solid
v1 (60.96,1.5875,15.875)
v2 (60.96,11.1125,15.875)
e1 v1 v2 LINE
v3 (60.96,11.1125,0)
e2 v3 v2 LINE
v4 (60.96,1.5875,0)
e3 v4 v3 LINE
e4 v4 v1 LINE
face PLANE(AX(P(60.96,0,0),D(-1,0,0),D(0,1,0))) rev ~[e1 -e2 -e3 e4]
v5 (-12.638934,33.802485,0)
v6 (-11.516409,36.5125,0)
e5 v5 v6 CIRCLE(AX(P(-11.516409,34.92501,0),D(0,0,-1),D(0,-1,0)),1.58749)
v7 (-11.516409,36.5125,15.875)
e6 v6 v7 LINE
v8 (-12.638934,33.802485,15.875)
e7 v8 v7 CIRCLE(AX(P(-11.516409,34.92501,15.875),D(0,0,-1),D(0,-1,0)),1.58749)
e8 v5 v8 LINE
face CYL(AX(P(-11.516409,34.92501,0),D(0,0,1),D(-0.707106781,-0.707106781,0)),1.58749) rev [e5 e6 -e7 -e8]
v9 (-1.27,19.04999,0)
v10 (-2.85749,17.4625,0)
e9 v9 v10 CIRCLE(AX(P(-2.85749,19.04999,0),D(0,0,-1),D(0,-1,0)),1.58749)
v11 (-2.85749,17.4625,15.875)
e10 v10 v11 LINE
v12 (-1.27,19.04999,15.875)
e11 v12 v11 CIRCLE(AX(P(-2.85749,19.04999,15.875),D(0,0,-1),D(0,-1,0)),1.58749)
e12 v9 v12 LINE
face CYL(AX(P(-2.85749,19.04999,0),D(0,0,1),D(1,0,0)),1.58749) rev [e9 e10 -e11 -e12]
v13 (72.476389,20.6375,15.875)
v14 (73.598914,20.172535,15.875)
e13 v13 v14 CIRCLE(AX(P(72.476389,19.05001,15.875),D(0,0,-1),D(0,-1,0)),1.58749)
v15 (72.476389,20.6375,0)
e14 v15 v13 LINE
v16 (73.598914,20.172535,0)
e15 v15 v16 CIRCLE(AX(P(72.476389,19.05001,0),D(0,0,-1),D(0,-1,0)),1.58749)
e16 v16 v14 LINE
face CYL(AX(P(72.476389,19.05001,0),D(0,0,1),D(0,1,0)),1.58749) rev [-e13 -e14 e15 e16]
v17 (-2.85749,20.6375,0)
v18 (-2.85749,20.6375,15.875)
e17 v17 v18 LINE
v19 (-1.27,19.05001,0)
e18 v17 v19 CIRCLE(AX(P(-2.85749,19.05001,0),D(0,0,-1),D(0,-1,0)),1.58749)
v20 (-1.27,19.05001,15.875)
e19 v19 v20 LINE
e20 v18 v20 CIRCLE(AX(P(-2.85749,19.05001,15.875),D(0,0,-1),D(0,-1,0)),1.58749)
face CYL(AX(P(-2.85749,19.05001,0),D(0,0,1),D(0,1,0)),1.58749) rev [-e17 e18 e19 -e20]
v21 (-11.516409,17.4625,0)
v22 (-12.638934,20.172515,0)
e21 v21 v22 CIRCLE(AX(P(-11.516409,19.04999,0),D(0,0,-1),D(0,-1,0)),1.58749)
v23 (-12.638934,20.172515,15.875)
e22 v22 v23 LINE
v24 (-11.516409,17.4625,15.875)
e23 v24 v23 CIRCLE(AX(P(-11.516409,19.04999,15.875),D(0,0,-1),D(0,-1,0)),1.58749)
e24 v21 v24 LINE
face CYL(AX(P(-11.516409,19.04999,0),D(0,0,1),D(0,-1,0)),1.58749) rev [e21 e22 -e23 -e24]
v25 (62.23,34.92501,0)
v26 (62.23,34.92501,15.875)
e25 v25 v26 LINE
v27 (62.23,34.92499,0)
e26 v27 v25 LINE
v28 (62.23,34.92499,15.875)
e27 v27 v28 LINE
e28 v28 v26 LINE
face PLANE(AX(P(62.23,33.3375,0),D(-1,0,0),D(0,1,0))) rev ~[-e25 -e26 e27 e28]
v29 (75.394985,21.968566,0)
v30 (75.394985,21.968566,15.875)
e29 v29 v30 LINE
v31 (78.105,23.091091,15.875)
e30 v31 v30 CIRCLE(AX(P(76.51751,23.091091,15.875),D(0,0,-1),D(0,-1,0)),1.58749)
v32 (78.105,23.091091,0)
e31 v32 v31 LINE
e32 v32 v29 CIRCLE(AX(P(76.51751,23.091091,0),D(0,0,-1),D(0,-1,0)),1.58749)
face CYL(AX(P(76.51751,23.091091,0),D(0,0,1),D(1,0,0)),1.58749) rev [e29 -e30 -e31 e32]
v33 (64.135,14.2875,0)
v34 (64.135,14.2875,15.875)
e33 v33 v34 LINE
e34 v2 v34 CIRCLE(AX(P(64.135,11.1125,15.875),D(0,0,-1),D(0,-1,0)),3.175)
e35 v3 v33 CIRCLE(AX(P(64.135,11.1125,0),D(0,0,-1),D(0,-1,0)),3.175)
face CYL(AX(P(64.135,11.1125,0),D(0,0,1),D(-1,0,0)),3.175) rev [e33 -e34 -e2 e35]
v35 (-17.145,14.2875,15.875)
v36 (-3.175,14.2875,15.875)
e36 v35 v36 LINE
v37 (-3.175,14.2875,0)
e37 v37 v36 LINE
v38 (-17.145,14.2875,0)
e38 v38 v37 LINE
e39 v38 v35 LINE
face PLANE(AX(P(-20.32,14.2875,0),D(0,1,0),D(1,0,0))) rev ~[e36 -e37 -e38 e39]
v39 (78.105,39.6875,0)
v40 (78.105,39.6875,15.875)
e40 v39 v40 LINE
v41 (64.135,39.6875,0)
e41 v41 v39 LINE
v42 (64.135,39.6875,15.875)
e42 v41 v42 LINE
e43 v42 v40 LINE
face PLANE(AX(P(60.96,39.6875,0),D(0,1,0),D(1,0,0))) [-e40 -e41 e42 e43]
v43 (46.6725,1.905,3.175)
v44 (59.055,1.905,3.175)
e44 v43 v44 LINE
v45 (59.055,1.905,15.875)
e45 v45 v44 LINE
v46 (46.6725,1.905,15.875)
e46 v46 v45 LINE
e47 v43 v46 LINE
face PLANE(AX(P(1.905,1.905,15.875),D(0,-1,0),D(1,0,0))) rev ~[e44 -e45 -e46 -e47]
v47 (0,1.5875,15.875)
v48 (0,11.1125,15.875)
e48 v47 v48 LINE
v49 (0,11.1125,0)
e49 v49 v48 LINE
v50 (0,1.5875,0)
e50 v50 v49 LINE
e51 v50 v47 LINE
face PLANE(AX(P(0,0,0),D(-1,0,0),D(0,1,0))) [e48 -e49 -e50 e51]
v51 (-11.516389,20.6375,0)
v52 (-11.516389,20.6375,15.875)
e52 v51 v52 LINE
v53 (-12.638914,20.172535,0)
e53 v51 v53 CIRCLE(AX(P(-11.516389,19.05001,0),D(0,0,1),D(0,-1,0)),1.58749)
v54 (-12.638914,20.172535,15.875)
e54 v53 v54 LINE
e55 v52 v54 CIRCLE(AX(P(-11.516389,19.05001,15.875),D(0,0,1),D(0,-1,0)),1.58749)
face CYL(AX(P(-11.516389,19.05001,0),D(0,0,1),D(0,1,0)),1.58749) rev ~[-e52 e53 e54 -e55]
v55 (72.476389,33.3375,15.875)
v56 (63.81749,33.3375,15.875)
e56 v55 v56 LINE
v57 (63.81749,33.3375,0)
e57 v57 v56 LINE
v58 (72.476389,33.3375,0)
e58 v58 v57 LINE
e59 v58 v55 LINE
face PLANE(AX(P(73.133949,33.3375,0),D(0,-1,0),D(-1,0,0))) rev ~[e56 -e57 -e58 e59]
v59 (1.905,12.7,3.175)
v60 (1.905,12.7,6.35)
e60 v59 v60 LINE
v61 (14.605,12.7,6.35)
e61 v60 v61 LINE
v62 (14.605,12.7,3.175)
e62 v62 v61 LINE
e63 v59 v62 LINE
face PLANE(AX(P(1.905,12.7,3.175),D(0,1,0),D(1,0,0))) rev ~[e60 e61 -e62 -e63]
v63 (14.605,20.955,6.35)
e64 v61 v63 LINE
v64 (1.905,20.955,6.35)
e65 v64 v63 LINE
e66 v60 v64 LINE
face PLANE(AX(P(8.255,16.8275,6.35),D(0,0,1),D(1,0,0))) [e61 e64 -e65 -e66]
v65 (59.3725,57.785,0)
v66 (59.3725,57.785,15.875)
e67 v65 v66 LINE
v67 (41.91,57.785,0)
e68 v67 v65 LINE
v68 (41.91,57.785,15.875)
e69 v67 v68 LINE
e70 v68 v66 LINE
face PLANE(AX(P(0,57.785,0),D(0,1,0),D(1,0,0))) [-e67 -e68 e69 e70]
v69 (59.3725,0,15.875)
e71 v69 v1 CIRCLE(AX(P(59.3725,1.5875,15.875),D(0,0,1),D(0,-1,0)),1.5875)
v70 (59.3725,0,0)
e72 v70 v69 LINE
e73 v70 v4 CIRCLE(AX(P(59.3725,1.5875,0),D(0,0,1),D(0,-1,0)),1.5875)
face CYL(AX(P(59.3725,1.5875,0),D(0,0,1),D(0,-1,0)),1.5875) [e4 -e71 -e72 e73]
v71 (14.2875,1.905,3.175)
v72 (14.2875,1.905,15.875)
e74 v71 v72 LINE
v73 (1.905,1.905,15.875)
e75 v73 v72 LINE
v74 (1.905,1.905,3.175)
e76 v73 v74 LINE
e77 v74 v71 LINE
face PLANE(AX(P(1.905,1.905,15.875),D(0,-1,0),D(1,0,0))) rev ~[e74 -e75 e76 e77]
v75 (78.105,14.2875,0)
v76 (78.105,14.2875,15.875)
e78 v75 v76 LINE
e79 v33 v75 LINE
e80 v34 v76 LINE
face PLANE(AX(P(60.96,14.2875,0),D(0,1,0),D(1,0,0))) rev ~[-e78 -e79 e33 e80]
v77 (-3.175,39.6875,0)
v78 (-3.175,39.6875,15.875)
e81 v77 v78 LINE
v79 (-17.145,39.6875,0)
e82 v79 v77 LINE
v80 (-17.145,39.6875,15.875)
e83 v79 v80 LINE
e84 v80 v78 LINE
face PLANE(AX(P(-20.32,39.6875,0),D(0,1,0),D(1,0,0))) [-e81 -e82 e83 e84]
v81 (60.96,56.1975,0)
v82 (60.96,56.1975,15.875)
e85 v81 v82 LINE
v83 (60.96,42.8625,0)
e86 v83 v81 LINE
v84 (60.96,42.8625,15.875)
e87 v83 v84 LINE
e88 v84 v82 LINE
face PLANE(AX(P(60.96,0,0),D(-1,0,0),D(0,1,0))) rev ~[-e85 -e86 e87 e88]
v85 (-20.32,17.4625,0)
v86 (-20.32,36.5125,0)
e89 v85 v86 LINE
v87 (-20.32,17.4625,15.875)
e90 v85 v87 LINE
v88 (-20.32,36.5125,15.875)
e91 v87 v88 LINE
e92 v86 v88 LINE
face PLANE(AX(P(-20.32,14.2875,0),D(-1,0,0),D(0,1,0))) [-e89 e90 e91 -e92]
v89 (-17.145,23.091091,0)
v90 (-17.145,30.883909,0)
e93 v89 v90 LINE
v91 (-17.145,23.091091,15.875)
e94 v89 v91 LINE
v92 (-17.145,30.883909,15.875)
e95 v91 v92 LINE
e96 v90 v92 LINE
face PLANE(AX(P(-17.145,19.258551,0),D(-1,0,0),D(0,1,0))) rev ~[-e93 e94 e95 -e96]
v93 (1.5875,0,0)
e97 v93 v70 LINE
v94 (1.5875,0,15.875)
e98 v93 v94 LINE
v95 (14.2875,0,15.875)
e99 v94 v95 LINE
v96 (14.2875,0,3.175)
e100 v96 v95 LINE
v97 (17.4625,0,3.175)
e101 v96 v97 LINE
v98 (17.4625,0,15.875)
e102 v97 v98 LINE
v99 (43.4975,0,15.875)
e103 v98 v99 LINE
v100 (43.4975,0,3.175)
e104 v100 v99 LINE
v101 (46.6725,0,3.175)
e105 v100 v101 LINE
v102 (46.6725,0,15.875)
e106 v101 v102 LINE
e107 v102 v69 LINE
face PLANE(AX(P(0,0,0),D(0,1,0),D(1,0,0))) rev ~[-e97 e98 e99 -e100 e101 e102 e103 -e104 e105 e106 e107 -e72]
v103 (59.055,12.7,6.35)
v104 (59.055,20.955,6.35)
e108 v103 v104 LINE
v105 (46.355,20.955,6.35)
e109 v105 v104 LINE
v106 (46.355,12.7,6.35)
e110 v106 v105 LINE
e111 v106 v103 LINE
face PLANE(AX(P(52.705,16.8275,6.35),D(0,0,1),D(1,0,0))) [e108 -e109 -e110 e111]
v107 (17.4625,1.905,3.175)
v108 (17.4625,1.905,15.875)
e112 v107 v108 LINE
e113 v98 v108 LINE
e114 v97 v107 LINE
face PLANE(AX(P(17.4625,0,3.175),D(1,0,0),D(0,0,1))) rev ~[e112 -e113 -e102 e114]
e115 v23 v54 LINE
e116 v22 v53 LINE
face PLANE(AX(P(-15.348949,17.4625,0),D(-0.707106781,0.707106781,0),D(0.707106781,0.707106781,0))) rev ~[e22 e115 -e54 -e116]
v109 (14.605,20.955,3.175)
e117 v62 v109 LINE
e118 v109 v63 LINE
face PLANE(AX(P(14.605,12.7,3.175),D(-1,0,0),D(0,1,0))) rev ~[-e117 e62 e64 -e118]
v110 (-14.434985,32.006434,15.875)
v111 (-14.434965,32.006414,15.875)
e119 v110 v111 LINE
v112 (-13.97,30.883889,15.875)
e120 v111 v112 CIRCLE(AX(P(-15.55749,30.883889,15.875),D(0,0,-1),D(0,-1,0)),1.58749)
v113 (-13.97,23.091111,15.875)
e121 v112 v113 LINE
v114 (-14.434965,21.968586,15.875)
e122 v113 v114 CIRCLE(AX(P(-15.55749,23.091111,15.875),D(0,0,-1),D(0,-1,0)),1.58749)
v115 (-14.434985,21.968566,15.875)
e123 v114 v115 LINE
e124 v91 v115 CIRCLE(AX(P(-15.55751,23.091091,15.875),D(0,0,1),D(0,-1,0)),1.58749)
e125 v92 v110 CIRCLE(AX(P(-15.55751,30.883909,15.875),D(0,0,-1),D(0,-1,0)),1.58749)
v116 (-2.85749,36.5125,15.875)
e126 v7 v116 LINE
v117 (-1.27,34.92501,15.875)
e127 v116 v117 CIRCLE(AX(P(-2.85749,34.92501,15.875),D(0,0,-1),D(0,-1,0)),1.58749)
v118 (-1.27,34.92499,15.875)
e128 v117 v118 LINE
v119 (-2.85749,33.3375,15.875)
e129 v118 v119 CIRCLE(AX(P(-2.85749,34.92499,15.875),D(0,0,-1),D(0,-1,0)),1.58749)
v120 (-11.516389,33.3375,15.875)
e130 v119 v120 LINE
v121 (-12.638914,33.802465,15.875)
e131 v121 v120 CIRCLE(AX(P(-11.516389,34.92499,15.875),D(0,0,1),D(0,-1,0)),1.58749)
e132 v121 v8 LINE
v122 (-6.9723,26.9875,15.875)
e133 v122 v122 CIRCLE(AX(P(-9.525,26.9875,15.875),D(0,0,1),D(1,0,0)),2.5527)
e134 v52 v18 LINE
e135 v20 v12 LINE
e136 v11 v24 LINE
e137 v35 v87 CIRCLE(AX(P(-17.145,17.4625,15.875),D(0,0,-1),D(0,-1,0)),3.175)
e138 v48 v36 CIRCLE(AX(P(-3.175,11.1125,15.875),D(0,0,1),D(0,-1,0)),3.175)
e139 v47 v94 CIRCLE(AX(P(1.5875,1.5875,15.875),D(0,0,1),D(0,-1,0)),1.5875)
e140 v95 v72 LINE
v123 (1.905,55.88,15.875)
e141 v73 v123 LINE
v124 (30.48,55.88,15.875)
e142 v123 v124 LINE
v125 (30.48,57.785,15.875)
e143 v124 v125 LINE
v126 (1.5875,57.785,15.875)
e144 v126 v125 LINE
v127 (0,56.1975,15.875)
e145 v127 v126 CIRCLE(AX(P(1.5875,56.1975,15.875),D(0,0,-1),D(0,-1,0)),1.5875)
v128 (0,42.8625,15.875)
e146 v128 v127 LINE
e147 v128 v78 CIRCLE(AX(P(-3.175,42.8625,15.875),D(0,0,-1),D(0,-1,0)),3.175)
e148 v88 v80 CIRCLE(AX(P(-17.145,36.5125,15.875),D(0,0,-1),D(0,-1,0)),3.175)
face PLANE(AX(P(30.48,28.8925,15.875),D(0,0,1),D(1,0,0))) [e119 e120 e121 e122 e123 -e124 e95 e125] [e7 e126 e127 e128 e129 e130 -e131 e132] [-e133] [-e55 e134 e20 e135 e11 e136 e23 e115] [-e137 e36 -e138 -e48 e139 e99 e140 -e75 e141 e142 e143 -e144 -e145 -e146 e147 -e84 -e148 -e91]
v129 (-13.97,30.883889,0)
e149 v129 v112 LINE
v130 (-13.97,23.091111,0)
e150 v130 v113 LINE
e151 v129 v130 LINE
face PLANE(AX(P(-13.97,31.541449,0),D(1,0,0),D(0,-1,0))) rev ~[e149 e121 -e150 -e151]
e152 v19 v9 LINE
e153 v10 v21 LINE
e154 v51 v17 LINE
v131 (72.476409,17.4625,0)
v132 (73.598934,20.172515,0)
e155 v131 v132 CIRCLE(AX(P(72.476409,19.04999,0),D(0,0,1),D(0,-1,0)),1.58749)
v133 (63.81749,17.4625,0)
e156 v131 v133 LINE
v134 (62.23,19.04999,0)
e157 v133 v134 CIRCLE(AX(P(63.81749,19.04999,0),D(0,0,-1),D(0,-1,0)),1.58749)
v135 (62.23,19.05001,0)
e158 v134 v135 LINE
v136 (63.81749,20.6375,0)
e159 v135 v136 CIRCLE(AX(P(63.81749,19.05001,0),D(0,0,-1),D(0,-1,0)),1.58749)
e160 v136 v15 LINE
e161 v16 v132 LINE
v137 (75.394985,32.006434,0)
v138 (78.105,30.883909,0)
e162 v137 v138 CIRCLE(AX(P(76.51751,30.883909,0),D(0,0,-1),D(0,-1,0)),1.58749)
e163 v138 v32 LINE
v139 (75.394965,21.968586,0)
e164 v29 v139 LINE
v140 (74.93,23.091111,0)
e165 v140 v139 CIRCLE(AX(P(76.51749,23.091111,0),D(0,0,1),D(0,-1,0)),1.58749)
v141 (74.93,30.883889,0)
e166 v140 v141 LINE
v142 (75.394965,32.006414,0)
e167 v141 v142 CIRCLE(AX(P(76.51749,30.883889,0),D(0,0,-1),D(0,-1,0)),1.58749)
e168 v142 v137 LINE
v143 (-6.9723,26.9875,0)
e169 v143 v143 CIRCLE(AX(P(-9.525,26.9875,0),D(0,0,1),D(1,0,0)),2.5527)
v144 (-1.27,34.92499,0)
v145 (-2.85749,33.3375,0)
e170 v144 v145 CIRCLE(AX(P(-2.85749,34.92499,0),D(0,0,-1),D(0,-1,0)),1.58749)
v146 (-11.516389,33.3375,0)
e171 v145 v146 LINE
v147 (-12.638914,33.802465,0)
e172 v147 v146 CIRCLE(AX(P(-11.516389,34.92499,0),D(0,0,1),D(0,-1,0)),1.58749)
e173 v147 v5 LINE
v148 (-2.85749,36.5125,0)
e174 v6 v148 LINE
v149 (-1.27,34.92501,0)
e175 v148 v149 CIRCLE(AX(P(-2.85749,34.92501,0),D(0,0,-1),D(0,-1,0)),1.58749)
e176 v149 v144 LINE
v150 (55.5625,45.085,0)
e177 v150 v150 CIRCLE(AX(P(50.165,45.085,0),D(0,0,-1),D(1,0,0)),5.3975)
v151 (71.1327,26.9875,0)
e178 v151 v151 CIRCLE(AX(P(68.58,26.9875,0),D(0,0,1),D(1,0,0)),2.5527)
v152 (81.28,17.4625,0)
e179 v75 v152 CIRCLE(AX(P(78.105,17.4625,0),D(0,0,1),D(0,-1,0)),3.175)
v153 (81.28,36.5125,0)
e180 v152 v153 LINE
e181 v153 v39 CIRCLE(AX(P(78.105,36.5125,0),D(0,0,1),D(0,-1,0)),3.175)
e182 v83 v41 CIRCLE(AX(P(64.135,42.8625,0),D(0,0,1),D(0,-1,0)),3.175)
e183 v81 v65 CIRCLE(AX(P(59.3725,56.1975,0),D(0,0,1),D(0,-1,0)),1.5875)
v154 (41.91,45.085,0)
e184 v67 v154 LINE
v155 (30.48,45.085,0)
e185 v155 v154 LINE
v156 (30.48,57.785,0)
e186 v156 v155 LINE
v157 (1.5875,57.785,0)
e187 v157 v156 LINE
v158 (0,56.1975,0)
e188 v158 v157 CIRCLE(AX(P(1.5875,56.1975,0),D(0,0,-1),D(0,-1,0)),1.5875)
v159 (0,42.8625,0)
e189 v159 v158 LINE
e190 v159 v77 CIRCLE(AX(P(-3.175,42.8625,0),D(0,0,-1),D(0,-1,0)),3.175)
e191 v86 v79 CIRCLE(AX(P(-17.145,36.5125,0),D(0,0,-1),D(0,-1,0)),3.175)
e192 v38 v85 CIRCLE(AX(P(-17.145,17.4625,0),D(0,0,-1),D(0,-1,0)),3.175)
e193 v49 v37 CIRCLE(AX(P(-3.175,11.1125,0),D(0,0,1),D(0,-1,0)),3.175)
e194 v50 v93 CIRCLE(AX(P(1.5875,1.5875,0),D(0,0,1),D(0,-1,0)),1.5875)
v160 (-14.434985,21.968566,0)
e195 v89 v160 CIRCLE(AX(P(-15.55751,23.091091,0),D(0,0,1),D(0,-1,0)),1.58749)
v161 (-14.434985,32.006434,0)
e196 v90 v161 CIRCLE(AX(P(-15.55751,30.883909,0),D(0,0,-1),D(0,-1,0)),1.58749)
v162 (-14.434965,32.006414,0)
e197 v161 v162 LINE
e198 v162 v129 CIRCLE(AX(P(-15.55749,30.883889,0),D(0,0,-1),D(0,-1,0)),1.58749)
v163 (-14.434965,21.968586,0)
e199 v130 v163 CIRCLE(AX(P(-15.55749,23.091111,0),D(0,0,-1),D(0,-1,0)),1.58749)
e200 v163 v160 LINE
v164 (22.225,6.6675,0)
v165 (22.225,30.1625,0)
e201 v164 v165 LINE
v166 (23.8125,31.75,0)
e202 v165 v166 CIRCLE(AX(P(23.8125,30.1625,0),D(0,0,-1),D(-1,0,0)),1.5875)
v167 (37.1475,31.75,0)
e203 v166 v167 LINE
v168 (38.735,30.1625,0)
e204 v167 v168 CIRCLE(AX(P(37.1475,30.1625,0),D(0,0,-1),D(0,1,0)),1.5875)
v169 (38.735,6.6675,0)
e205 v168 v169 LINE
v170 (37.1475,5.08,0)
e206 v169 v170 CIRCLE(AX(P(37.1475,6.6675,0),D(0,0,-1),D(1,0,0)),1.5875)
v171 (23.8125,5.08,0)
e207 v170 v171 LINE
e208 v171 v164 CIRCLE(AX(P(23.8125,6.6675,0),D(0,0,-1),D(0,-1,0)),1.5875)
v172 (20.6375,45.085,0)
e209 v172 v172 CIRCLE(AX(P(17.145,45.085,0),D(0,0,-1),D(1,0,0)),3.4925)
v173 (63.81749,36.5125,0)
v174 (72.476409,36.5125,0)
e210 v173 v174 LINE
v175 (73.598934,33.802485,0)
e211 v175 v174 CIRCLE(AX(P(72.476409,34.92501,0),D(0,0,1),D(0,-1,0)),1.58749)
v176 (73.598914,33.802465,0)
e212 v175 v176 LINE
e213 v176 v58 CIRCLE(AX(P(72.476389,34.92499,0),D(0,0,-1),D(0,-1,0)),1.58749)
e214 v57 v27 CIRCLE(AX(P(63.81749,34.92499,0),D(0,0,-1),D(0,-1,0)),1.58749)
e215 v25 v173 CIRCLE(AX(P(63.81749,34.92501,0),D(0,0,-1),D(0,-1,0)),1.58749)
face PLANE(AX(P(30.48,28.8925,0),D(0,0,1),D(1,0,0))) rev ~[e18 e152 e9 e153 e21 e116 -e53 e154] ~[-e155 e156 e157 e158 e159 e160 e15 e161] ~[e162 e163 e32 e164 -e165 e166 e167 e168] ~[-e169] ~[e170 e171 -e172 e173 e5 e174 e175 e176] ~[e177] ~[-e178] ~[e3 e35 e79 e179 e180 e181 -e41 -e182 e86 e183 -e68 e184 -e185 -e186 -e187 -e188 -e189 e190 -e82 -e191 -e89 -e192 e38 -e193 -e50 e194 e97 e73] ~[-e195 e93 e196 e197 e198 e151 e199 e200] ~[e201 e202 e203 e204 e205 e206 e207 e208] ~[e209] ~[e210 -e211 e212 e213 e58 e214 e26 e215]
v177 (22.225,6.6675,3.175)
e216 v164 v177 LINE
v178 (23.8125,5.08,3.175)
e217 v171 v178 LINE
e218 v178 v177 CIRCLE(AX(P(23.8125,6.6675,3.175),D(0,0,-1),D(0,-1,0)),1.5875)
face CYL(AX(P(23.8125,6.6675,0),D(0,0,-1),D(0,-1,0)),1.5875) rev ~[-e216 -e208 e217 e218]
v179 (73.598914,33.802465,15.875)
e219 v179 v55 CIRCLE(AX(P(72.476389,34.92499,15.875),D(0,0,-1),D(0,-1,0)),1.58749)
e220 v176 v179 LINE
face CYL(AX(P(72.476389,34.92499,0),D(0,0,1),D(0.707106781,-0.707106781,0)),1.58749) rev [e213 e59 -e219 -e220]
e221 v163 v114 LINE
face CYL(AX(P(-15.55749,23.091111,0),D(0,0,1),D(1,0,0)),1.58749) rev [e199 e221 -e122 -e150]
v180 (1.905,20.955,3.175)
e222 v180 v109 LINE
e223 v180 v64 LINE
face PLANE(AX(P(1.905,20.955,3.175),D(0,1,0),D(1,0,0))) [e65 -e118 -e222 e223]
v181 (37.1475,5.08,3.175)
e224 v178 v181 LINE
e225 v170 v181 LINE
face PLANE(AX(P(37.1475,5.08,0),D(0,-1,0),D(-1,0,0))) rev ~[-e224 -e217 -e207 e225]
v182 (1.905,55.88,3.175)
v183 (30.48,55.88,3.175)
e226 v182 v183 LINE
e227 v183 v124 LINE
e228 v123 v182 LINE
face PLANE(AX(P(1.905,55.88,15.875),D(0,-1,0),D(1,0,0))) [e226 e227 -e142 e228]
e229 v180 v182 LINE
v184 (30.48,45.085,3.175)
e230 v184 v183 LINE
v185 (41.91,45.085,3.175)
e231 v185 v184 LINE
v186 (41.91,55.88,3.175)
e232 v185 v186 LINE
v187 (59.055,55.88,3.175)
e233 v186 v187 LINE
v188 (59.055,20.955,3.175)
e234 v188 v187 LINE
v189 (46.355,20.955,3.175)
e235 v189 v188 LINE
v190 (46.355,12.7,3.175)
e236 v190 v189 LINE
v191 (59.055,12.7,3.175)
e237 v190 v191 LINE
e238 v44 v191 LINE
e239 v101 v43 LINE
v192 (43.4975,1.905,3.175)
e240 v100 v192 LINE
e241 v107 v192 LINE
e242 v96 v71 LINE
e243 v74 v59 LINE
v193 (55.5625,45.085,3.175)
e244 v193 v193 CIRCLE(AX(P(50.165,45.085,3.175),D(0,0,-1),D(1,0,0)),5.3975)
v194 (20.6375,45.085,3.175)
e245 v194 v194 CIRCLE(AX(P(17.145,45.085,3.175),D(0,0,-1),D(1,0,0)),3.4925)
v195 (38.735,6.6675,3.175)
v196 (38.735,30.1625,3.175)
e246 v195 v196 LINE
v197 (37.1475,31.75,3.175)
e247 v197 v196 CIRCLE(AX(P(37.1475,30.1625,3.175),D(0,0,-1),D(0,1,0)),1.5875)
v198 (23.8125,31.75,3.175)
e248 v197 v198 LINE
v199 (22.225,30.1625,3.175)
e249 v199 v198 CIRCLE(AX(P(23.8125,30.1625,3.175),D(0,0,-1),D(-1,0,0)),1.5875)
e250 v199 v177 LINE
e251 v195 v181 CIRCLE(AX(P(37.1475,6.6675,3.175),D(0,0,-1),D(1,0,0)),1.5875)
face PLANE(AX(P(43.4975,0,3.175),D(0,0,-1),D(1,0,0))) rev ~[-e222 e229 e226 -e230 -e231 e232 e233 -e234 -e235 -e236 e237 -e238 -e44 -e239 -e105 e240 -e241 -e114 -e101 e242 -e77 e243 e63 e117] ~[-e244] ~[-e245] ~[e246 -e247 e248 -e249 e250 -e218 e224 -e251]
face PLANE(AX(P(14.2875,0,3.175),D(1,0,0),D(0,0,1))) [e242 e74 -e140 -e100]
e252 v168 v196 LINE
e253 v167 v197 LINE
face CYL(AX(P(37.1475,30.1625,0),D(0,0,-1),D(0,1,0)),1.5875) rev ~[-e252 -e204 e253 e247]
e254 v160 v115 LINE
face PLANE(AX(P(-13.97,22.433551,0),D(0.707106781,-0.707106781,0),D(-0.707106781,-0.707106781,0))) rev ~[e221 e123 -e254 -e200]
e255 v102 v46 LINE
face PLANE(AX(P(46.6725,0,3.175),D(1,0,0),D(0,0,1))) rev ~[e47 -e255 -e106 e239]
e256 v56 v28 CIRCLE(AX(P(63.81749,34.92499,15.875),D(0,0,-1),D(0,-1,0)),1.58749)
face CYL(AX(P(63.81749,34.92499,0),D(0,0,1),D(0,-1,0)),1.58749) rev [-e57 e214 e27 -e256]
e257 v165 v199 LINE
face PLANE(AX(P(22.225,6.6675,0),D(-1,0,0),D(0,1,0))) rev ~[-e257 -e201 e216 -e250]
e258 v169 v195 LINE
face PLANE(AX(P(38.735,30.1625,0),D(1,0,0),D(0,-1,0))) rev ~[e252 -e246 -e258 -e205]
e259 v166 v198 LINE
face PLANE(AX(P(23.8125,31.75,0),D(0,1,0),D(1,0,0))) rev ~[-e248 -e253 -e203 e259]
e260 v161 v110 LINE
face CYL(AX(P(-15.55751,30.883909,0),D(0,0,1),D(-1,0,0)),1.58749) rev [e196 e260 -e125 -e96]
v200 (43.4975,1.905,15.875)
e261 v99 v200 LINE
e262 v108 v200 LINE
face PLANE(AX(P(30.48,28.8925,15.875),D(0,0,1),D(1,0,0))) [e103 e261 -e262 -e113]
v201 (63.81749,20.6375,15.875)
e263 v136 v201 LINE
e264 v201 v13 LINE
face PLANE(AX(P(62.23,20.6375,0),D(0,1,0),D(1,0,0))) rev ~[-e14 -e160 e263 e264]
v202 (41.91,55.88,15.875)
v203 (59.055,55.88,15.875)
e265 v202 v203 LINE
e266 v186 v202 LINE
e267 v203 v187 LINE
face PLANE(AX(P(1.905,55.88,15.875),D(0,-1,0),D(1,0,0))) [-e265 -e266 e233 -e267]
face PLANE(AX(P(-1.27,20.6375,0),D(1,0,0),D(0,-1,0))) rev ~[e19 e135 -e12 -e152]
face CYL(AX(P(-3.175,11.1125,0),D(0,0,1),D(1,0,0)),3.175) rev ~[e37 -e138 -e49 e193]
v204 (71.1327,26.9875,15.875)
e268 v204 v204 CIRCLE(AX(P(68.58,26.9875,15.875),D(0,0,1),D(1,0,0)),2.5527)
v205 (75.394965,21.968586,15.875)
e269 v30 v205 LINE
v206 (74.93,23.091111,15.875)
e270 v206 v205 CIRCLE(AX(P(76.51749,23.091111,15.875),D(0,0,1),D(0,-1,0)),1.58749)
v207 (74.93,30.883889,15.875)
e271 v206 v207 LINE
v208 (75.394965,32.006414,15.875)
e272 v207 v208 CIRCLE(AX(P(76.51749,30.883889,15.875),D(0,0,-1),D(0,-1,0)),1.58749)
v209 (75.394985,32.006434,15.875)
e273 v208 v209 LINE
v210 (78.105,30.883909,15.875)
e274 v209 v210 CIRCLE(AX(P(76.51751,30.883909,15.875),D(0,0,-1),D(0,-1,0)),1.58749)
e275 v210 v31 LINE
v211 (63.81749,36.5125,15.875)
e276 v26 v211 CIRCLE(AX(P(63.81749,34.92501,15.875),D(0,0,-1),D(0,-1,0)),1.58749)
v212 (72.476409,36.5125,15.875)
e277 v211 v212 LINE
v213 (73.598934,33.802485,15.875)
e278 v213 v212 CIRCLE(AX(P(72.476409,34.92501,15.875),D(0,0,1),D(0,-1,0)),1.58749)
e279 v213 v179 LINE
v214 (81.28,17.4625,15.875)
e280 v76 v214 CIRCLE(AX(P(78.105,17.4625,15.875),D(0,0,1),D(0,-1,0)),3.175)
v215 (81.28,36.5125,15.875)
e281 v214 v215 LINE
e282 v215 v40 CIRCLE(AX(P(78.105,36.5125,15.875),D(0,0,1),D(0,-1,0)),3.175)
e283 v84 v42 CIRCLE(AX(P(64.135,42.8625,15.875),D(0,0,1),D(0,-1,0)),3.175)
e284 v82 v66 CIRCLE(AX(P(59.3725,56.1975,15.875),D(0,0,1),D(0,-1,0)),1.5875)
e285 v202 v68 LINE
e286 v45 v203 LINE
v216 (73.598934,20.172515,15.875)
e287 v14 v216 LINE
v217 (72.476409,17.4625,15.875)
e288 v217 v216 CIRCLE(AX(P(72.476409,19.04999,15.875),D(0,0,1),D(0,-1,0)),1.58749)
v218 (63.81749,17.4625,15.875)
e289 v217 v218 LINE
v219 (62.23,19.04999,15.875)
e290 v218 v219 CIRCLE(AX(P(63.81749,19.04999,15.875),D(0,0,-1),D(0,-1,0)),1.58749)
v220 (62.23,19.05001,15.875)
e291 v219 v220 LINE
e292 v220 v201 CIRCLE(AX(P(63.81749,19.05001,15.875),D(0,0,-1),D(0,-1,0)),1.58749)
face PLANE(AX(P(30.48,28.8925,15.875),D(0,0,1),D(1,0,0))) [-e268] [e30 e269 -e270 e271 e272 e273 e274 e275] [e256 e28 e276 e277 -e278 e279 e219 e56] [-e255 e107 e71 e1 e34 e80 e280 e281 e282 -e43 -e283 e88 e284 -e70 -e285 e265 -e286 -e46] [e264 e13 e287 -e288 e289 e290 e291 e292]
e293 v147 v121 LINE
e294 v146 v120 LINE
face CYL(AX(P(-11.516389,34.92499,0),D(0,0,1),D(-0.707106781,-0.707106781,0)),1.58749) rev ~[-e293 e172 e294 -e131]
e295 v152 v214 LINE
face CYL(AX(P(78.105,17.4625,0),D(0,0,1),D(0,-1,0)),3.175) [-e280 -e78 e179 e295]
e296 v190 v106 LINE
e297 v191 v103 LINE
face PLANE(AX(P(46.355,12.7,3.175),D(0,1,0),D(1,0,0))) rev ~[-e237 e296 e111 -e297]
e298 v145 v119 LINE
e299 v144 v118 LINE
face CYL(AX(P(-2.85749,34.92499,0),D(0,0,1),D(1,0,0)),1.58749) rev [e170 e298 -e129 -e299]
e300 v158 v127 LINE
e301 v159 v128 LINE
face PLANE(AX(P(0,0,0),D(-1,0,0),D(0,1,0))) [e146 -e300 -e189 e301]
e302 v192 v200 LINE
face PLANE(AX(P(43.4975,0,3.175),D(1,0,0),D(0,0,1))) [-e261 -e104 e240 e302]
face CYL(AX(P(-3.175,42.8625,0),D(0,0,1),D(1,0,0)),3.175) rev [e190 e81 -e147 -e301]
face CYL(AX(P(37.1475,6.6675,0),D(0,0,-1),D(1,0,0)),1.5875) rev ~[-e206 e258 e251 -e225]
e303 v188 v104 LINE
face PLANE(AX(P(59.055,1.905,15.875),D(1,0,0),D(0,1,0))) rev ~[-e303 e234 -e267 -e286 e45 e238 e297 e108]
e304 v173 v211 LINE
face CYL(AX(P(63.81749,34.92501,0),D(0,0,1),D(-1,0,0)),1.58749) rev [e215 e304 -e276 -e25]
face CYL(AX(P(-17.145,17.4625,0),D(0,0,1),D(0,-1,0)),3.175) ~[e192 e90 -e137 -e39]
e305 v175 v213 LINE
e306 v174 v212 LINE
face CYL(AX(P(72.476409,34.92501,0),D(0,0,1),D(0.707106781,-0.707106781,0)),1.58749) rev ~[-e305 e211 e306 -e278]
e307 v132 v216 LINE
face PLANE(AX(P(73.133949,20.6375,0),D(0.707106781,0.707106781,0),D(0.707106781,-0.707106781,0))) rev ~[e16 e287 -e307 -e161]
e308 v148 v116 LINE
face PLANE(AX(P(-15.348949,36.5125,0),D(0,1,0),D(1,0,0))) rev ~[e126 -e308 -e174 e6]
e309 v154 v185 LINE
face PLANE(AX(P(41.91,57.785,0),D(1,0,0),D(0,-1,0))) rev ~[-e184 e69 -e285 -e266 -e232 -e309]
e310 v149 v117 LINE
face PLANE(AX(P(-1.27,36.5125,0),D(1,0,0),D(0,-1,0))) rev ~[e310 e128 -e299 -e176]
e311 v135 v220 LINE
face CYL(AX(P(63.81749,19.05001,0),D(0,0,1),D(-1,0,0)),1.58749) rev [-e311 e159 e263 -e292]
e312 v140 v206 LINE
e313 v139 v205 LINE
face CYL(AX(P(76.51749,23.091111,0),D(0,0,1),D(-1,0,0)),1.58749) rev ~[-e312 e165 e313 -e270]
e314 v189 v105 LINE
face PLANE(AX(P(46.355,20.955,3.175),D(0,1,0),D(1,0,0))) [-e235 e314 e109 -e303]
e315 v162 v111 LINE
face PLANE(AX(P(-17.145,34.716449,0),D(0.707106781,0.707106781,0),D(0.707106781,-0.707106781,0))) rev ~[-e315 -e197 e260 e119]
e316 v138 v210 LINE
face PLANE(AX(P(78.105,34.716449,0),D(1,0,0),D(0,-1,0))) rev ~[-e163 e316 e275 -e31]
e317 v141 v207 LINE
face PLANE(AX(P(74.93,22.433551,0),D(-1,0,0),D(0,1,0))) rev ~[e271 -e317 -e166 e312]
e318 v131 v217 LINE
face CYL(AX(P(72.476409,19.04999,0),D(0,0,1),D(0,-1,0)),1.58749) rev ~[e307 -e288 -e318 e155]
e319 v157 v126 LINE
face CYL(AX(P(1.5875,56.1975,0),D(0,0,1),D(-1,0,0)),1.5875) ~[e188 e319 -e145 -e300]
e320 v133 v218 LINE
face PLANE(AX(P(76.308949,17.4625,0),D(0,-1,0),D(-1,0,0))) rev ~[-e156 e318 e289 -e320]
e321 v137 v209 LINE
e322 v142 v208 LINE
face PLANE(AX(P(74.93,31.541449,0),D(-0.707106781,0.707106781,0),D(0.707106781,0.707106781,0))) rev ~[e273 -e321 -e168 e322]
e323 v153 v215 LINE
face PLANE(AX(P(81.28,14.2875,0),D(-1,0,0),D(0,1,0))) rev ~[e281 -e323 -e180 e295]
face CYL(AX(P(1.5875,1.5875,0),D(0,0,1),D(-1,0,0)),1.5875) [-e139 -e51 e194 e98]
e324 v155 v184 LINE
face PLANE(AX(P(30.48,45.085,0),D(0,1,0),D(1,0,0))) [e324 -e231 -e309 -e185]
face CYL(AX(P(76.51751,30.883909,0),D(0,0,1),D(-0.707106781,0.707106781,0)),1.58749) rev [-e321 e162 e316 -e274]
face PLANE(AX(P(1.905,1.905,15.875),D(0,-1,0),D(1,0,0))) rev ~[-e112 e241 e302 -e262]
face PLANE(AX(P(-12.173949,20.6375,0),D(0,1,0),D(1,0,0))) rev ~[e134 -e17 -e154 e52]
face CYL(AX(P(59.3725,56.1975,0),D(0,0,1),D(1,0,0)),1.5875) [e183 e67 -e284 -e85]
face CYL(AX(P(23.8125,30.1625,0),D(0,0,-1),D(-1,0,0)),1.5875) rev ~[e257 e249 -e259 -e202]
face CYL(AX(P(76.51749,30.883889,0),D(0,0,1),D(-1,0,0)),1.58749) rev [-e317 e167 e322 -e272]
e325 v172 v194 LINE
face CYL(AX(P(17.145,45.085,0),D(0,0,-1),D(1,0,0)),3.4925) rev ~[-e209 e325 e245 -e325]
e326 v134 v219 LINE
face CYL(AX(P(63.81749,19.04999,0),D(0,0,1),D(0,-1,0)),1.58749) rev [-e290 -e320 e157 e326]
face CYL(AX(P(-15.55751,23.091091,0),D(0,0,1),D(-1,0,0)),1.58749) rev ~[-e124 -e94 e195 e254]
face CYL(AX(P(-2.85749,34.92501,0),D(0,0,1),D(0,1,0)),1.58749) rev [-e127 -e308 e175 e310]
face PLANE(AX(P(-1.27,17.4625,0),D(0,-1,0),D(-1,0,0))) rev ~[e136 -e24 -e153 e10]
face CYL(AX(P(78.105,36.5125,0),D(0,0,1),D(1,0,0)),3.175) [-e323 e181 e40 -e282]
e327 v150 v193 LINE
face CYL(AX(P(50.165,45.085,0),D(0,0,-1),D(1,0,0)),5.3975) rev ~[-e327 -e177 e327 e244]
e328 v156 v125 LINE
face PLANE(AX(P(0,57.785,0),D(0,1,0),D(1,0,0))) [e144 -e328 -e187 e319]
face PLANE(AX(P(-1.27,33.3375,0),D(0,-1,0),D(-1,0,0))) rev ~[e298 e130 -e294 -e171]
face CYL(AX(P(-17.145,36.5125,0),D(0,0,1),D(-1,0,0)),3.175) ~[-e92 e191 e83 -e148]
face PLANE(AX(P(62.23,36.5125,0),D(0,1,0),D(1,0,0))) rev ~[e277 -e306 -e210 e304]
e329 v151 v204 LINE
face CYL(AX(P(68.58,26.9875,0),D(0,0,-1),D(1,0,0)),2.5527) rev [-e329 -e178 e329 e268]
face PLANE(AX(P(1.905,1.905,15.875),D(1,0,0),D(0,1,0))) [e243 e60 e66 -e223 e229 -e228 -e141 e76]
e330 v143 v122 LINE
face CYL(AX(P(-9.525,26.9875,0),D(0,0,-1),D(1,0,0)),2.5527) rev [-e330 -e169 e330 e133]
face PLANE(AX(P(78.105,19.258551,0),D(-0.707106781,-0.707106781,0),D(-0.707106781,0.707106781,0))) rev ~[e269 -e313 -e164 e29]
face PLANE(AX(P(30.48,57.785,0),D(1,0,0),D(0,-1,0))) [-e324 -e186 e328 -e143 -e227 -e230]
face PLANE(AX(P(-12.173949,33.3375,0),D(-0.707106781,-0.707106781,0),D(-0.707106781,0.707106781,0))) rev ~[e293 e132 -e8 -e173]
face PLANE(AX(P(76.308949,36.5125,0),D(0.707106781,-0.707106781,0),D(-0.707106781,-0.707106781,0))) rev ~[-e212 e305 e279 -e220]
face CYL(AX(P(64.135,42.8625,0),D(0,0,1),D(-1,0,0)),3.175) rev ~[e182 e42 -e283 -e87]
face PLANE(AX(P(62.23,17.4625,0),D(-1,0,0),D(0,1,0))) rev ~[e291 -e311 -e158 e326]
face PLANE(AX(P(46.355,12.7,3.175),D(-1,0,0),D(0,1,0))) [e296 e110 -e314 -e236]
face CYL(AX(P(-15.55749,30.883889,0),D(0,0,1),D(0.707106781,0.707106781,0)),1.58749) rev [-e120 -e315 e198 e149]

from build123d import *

# Parameters (mm, degrees)
F0_W      = 60.96
F0_H      = 57.785
F1_DEPTH  = 15.875
F2_W      = 57.15
F2_H      = 53.975
F3_DEPTH  = 12.7
F4_R      = 3.4925
F4_R_2    = 5.3975
F5_DEPTH  = 15.876
F6_W      = 12.7
F6_H      = 8.255
F7_DEPTH  = 3.175
F4_W      = 11.43
F4_H      = 12.7
F10_DEPTH = 25.4
F11_R     = 1.5875
F12_W     = 20.32
F12_H     = 25.4
F12_R     = 2.5527
F13_DEPTH = 15.875
F14_R     = 3.175
F15_R     = 1.58749
F16_W     = 3.175
F16_H     = 12.7
F17_DEPTH = 1.905


# Not quite as in the source:
# - a fillet or chamfer is up to 0.001 mm smaller than in the source, because OpenCascade refuses the exact size
# - a feature names something its author has since deleted; it is built from what else it names


with BuildPart() as f1:
    # F0 (on Top) → F1 (new body)
    with BuildSketch(Plane.XY):
        with Locations((30.48, 28.8925)):
            Rectangle(F0_W, F0_H)
    extrude(amount=F1_DEPTH)

    # F2 (on face) → F3 (cut)
    with BuildSketch(Plane.XY.offset(15.875)):
        with Locations((30.48, 28.8925)):
            Rectangle(F2_W, F2_H)
    extrude(amount=-F3_DEPTH, mode=Mode.SUBTRACT)

    # F4 (on face) → F5 (cut, through all)
    with BuildSketch(Plane(origin=(0, 0, 0), x_dir=(1, 0, 0), z_dir=(0, 0, -1))):
        with Locations((17.145, -45.085)):
            Circle(F4_R)
        with Locations((50.165, -45.085)):
            Circle(F4_R_2)
        with BuildLine():
            Line((37.1475, -5.08), (23.8125, -5.08))
            ThreePointArc((23.8125, -5.08), (22.6899679849, -5.5449679849), (22.225, -6.6675))
            Line((22.225, -6.6675), (22.225, -30.1625))
            ThreePointArc((22.225, -30.1625), (22.6899679849, -31.2850320151), (23.8125, -31.75))
            Line((23.8125, -31.75), (37.1475, -31.75))
            ThreePointArc((37.1475, -31.75), (38.2700320151, -31.2850320151), (38.735, -30.1625))
            Line((38.735, -30.1625), (38.735, -6.6675))
            ThreePointArc((38.735, -6.6675), (38.2700320151, -5.5449679849), (37.1475, -5.08))
        make_face()
    extrude(amount=-F5_DEPTH, mode=Mode.SUBTRACT)

    # F6 (on face) → F7 (join)
    with BuildSketch(Plane.XY.offset(3.175)):
        with Locations((8.255, 16.8275)):
            Rectangle(F6_W, F6_H)
        with Locations((52.705, 16.8275)):
            Rectangle(F6_W, F6_H)
    extrude(amount=F7_DEPTH)

    # F4 (on face) → F10 (cut)
    with BuildSketch(Plane(origin=(0, 0, 0), x_dir=(1, 0, 0), z_dir=(0, 0, -1))):
        with Locations((36.195, -51.435)):
            Rectangle(F4_W, F4_H)
    extrude(amount=-F10_DEPTH, mode=Mode.SUBTRACT)

    # F11
    f11_edges = [f1.edges().sort_by_distance(p)[0] for p in [
        (0, 57.785, 7.9375),
        (0, 0, 7.9375),
        (60.96, 57.785, 7.9375),
        (60.96, 0, 7.9375),
    ]]
    fillet(f11_edges, radius=F11_R)

    # F12 (on Top) → F13 (join, through all)
    with BuildSketch(Plane.XY):
        with Locations((-10.16, 26.9875)):
            Rectangle(F12_W, F12_H)
        with Locations((-9.525, 26.9875)):
            Circle(F12_R, mode=Mode.SUBTRACT)
        Polygon((-12.1739487758, 20.6375), (-1.27, 20.6375), (-1.27, 17.4625), (-15.3489487758, 17.4625), (-17.145, 17.4625), (-17.145, 19.2585512242), (-17.145, 34.7164487758), (-17.145, 36.5125), (-15.3489487758, 36.5125), (-1.27, 36.5125), (-1.27, 33.3375), (-12.1739487758, 33.3375), (-13.97, 33.3375), (-13.97, 31.5414487758), (-13.97, 22.4335512242), (-13.97, 20.6375), align=None, mode=Mode.SUBTRACT)
        with Locations((71.12, 26.9875)):
            Rectangle(F12_W, F12_H)
        with Locations((68.58, 26.9875)):
            Circle(F12_R, mode=Mode.SUBTRACT)
        Polygon((76.3089487758, 17.4625), (62.23, 17.4625), (62.23, 20.6375), (73.1339487758, 20.6375), (74.93, 20.6375), (74.93, 22.4335512242), (74.93, 31.5414487758), (74.93, 33.3375), (73.1339487758, 33.3375), (62.23, 33.3375), (62.23, 36.5125), (76.3089487758, 36.5125), (78.105, 36.5125), (78.105, 34.7164487758), (78.105, 19.2585512242), (78.105, 17.4625), align=None, mode=Mode.SUBTRACT)
        Polygon((73.1339487758, 20.6375), (76.3089487758, 17.4625), (78.105, 17.4625), (78.105, 19.2585512242), (74.93, 22.4335512242), (74.93, 20.6375), align=None)
        Polygon((74.93, 31.5414487758), (78.105, 34.7164487758), (78.105, 36.5125), (76.3089487758, 36.5125), (73.1339487758, 33.3375), (74.93, 33.3375), align=None)
        Polygon((-17.145, 34.7164487758), (-13.97, 31.5414487758), (-13.97, 33.3375), (-12.1739487758, 33.3375), (-15.3489487758, 36.5125), (-17.145, 36.5125), align=None)
        Polygon((-15.3489487758, 17.4625), (-12.1739487758, 20.6375), (-13.97, 20.6375), (-13.97, 22.4335512242), (-17.145, 19.2585512242), (-17.145, 17.4625), align=None)
    extrude(amount=F13_DEPTH)

    # F14
    f14_edges = [f1.edges().sort_by_distance(p)[0] for p in [
        (-20.32, 14.2875, 7.9375),
        (0, 14.2875, 7.9375),
        (-20.32, 39.6875, 7.9375),
        (0, 39.6875, 7.9375),
        (60.96, 14.2875, 7.9375),
        (81.28, 14.2875, 7.9375),
        (81.28, 39.6875, 7.9375),
        (60.96, 39.6875, 7.9375),
    ]]
    fillet(f14_edges, radius=F14_R)

    # F15 (radius 1.5875 in the source; OpenCascade refuses exactly that, so slightly less here)
    f15_edges = [f1.edges().sort_by_distance(p)[0] for p in [
        (62.23, 17.4625, 7.9375),
        (62.23, 20.6375, 7.9375),
        (62.23, 33.3375, 7.9375),
        (62.23, 36.5125, 7.9375),
        (76.308949, 17.4625, 7.9375),
        (78.105, 19.258551, 7.9375),
        (78.105, 34.716449, 7.9375),
        (74.93, 31.541449, 7.9375),
        (74.93, 22.433551, 7.9375),
        (73.133949, 20.6375, 7.9375),
        (73.133949, 33.3375, 7.9375),
        (76.308949, 36.5125, 7.9375),
        (-1.27, 33.3375, 7.9375),
        (-1.27, 36.5125, 7.9375),
        (-15.348949, 36.5125, 7.9375),
        (-12.173949, 33.3375, 7.9375),
        (-15.348949, 17.4625, 7.9375),
        (-12.173949, 20.6375, 7.9375),
        (-1.27, 17.4625, 7.9375),
        (-1.27, 20.6375, 7.9375),
        (-17.145, 19.258551, 7.9375),
        (-13.97, 22.433551, 7.9375),
        (-17.145, 34.716449, 7.9375),
        (-13.97, 31.541449, 7.9375),
    ]]
    fillet(f15_edges, radius=F15_R)

    # F16 (on face) → F17 (cut, through all)
    with BuildSketch(Plane.XZ):
        with Locations((15.875, 9.525)):
            Rectangle(F16_W, F16_H)
        with Locations((45.085, 9.525)):
            Rectangle(F16_W, F16_H)
    extrude(amount=-F17_DEPTH, mode=Mode.SUBTRACT)


solid = f1.part
